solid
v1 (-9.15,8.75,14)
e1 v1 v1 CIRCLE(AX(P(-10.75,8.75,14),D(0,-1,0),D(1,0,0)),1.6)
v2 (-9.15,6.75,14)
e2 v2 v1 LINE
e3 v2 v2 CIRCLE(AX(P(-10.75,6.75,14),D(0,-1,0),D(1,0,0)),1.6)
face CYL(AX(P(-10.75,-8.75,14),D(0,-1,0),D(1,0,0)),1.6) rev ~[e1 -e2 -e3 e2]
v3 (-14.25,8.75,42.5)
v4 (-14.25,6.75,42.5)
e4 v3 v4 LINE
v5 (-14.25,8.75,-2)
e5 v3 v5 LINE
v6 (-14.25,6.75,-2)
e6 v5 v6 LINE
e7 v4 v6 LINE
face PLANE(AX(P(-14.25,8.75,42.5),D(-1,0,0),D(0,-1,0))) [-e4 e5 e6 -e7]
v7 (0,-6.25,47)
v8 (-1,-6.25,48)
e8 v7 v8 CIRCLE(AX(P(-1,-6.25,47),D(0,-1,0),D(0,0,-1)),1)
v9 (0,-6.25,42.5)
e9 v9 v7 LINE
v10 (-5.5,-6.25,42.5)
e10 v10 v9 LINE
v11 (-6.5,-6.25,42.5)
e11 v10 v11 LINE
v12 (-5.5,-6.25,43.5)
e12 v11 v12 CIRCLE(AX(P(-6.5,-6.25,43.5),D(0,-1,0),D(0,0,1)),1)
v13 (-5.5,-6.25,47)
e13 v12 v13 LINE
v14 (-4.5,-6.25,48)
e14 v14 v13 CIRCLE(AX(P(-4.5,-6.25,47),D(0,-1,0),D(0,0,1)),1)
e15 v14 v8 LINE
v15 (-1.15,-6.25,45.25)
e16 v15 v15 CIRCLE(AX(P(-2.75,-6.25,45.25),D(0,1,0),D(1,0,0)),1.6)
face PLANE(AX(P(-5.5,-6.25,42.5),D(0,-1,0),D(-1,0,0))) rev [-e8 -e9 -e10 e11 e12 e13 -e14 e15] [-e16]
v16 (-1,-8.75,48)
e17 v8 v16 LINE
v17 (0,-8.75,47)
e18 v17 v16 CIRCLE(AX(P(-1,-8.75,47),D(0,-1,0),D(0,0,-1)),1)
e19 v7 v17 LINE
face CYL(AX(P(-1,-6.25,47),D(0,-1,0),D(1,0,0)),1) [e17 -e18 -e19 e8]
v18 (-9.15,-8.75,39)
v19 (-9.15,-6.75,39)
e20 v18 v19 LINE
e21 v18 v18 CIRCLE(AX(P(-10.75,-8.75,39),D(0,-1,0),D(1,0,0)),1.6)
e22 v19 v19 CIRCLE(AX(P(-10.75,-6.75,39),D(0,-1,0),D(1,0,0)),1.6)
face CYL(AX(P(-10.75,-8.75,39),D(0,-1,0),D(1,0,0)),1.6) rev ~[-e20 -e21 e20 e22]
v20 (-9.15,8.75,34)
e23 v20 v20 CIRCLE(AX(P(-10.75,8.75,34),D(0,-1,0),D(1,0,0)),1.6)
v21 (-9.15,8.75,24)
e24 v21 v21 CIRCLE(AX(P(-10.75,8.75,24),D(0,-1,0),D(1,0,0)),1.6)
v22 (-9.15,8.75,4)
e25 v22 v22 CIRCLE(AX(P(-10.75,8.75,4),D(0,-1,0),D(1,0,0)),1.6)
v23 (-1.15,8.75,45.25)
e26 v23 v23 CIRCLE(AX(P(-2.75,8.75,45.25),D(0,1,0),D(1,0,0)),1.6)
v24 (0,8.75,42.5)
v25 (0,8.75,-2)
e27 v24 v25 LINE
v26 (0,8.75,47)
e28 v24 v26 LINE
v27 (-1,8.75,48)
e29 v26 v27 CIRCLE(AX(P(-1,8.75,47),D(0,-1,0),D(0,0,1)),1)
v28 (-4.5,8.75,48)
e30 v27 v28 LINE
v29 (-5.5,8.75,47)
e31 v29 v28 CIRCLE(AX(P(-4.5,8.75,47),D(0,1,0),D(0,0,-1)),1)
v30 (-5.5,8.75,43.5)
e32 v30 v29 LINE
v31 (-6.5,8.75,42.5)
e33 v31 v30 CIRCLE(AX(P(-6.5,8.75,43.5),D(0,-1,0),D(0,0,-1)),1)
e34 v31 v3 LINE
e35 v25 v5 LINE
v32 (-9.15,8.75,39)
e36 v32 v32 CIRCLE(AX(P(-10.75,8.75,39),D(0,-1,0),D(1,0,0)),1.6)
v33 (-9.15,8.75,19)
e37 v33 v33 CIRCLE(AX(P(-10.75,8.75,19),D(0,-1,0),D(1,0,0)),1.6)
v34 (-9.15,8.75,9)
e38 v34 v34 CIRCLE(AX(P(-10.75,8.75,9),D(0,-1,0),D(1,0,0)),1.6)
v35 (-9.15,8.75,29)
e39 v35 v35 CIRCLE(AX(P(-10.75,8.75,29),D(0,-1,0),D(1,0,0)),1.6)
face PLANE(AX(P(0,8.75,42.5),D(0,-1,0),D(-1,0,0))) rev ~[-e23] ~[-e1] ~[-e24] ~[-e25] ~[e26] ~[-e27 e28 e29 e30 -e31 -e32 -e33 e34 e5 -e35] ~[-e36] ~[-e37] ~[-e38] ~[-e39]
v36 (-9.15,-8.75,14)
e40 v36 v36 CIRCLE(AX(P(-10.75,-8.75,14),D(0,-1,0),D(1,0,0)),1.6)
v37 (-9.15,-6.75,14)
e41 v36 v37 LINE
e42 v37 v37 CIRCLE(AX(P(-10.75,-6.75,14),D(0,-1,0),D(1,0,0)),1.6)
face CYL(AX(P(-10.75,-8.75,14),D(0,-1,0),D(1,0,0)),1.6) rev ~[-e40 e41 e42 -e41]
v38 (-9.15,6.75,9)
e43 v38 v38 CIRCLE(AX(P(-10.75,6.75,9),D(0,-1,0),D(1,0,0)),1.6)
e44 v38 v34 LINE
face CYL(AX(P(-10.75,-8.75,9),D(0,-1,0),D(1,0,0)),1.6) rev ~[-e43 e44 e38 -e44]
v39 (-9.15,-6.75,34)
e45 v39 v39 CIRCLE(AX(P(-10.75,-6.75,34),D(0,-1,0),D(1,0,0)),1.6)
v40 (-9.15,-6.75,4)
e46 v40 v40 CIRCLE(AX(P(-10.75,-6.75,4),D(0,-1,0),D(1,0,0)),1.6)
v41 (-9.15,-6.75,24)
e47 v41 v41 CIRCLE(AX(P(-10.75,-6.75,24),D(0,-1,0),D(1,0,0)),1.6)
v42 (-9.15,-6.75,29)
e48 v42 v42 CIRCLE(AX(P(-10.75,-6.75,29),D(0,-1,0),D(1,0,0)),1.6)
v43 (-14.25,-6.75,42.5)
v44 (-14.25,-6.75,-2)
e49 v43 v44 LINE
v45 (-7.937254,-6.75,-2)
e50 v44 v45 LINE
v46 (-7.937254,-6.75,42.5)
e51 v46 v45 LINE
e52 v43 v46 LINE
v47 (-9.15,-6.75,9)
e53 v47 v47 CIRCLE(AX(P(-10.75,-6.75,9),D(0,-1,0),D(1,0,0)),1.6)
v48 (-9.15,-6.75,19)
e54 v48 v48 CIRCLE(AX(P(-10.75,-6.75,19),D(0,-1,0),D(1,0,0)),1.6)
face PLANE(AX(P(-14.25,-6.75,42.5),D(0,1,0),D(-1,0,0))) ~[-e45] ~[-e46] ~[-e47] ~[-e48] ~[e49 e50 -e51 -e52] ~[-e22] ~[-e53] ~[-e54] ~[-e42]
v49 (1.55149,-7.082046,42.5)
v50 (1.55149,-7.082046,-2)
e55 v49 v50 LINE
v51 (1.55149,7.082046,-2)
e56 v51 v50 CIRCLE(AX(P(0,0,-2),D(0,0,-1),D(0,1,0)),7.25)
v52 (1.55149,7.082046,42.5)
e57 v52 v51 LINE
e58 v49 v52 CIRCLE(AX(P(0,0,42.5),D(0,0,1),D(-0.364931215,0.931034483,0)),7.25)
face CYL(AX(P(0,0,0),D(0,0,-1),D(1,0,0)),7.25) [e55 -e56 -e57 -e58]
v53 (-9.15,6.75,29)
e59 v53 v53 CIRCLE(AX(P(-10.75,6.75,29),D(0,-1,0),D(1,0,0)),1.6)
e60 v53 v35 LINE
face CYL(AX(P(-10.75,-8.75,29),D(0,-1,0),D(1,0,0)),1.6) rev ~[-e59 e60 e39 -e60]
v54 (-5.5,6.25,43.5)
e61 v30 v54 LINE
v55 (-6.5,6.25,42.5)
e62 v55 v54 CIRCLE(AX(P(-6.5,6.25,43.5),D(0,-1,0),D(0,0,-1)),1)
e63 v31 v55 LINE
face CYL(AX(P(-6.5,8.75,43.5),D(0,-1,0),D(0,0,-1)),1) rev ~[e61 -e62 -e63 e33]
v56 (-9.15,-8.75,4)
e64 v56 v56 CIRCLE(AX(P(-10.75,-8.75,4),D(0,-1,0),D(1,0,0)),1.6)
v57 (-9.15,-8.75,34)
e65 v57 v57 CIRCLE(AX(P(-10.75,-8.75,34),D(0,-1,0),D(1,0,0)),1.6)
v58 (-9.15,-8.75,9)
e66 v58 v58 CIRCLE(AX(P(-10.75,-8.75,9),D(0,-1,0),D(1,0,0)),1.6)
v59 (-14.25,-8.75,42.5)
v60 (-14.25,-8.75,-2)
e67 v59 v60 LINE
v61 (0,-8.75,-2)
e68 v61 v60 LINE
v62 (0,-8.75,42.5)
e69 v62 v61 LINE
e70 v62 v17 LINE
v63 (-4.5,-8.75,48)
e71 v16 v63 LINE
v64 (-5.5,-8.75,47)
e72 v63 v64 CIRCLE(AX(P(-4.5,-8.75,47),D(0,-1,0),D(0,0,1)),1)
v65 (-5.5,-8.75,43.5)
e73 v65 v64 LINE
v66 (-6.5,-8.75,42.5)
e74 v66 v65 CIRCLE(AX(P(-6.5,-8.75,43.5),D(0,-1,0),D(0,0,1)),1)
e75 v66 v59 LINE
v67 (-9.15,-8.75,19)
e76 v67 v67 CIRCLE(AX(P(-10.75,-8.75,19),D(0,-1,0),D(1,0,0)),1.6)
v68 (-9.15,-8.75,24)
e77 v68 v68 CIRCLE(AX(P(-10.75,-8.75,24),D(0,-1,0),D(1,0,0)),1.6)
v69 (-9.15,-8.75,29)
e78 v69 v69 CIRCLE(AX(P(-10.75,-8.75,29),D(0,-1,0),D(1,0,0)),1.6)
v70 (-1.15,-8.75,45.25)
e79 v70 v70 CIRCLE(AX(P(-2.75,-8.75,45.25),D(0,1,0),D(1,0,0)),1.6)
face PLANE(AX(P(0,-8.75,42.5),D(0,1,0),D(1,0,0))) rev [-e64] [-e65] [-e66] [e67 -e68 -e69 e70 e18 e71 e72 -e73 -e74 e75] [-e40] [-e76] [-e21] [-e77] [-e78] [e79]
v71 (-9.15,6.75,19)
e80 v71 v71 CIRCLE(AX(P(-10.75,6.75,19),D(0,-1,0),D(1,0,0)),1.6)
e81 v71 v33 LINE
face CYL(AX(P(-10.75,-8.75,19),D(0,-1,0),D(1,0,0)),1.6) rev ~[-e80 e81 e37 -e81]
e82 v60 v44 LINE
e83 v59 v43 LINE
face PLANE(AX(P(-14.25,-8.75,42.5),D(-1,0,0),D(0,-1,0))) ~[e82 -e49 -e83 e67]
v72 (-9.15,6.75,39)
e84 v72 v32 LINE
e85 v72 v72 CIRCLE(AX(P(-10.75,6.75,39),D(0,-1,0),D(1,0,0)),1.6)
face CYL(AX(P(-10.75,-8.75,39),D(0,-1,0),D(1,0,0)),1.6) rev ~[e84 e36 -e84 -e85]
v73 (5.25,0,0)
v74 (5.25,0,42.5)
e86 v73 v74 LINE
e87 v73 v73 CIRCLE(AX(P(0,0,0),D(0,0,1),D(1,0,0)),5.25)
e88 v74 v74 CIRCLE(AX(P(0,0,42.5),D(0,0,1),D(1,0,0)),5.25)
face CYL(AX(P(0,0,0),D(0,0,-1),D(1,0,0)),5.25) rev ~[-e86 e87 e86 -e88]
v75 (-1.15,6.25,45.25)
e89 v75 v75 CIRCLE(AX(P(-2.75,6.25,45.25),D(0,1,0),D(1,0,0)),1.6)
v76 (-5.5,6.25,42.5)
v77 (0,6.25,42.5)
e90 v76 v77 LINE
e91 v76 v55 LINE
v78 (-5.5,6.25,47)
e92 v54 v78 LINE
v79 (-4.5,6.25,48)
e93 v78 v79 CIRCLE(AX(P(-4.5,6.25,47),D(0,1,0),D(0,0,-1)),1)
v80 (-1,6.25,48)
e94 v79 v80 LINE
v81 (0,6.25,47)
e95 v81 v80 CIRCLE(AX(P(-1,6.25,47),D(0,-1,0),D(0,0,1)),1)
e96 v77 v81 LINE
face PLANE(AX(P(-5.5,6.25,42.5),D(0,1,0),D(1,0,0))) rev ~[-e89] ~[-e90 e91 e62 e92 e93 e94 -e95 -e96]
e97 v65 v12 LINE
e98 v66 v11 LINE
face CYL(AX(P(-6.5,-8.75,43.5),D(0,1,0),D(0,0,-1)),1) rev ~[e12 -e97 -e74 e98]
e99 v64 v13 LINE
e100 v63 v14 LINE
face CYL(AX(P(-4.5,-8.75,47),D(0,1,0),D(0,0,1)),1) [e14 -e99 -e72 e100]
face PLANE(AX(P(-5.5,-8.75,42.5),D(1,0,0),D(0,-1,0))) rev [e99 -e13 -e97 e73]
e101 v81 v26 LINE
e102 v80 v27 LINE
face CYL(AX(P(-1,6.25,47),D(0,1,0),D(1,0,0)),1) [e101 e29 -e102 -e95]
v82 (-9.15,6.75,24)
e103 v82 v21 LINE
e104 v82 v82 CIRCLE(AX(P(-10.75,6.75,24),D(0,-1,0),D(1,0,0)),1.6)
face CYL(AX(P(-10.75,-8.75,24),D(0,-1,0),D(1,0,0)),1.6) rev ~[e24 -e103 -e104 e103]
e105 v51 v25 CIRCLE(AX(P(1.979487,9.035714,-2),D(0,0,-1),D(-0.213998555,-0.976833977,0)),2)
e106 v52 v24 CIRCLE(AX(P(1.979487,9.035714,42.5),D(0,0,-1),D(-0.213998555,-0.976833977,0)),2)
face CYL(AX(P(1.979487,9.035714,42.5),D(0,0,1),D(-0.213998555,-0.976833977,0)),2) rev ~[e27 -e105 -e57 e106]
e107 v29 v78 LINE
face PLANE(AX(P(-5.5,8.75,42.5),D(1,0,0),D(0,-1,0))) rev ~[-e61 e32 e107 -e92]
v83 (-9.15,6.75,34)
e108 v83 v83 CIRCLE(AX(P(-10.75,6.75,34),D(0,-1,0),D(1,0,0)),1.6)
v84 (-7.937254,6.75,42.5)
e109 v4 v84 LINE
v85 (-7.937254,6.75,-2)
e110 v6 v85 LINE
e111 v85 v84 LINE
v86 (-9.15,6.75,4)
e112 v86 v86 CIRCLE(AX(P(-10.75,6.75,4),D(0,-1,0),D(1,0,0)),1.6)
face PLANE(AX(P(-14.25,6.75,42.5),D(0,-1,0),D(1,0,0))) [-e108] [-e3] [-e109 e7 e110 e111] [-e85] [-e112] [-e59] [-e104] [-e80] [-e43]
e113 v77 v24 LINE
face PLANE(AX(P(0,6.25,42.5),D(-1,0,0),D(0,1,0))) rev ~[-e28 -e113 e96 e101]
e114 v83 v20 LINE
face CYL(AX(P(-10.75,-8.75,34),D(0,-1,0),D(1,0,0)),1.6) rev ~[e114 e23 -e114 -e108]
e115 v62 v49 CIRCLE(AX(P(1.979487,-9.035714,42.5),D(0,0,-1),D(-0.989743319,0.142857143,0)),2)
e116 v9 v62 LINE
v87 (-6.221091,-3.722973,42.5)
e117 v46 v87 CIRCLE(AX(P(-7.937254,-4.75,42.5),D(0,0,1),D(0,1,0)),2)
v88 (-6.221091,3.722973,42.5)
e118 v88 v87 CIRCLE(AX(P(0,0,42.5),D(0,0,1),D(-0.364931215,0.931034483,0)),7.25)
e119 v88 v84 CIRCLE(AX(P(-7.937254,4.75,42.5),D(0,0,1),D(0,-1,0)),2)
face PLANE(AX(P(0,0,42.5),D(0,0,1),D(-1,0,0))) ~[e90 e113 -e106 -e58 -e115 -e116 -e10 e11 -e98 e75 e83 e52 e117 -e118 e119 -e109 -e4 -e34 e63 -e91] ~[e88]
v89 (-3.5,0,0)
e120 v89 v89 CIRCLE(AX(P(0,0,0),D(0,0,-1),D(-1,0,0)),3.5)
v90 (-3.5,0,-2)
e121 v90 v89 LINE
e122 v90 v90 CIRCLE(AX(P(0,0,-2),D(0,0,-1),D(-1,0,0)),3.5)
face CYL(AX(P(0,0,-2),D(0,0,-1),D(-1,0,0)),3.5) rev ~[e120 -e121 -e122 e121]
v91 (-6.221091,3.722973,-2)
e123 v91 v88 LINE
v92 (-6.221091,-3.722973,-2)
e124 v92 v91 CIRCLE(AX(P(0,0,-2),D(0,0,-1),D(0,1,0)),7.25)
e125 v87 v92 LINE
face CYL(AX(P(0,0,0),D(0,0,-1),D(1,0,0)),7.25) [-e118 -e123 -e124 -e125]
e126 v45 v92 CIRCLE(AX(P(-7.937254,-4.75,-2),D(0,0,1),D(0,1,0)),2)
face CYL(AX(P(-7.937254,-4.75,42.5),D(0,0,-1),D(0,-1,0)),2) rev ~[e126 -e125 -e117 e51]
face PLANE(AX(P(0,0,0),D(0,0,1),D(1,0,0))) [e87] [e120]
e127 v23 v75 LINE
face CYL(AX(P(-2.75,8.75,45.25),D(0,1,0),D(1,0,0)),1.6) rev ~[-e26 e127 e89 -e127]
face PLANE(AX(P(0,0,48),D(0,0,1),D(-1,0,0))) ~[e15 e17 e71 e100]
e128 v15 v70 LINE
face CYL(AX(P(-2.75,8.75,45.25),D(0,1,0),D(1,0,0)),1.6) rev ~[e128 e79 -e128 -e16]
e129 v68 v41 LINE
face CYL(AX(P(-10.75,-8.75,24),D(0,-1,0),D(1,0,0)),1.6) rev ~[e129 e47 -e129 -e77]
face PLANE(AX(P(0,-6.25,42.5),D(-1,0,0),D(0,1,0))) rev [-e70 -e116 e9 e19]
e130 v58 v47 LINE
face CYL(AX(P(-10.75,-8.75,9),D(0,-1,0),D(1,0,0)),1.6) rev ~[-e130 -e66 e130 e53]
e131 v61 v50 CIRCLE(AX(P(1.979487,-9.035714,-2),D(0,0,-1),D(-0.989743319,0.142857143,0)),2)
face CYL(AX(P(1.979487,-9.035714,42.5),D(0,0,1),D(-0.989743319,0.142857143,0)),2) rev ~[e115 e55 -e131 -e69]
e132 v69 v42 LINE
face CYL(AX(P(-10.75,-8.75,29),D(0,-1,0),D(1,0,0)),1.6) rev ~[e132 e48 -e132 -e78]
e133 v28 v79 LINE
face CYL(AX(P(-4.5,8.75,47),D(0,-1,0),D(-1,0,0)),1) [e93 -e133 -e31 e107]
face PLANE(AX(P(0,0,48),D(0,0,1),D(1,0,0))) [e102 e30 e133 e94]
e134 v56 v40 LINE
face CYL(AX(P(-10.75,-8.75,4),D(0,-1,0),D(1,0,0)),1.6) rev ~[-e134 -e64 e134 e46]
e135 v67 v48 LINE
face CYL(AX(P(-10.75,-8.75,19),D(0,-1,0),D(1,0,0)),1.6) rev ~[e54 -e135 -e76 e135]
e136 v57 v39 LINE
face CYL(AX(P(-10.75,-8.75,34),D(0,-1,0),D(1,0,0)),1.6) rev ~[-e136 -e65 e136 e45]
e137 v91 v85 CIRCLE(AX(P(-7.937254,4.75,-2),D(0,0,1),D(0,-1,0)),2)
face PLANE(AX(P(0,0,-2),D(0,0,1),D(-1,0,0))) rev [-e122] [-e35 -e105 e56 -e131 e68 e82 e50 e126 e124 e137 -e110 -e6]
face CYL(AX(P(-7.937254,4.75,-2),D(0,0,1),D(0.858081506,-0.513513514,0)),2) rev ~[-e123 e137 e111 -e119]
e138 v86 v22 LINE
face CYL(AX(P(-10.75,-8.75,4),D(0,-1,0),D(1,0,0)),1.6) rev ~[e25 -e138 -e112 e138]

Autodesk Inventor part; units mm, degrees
ref_plane "YZ Plane" through (0, 0, 0) normal (1, 0, 0) x (0, 1, 0)
ref_plane "XZ Plane" through (0, 0, 0) normal (0, 1, 0) x (-1, 0, 0)
ref_plane "XY Plane" through (0, 0, 0) normal (0, 0, 1) x (1, 0, 0)
sketch "Sketch1" plane through (0, 0, 0) normal (0, 0, 1) x (1, 0, 0)
  circle A0 centre (0, 0) radius 5.25
  circle A1 centre (0, 0) radius 7.25
  dimension "d0" = 10.5
  dimension "d1" = 2
extrude "Extrusion1" add sketch "Sketch1" along normal blind 42.5
extrude "Extrusion2" add sketch "Sketch1" against normal blind 2 contours A0 | A1
sketch "Sketch2" plane through (0, 0, -2) normal (0, 0, -1) x (-1, 0, 0)
  circle A0 centre (0, 0) radius 7.25 construction
  circle A1 centre (0, 0) radius 3.5
  dimension "d6" = 7
extrude "Extrusion3" cut sketch "Sketch2" against normal through all
sketch "Sketch3" plane through (0, 0, 42.5) normal (0, 0, 1) x (1, 0, 0)
  circle A0 centre (0, 0) radius 7.25 construction
  circle A1 centre (0, 0) radius 5.25 construction
  line L0 (0, 0) -> (-18.4312, 0) construction
  circle A2 centre (0, 0) radius 7.25 construction
  line L1 (-2.6458, 6.75) -> (-14.25, 6.75) construction
  line L2 (-14.25, 6.75) -> (-14.25, -6.75) construction
  line L3 (-14.25, -6.75) -> (-2.6458, -6.75) construction
  line L4 (-2.6458, -6.75) -> (-2.6458, 6.75) construction
  line L5 (-7.25, 0) -> (-7.25, 11.3017) construction
  line L6 (-14.25, 6.75) -> (0, 6.75)
  line L7 (0, 6.75) -> (0, 8.75)
  line L8 (0, 8.75) -> (-14.25, 8.75)
  line L9 (-14.25, 8.75) -> (-14.25, 6.75)
  dimension "d9" = 7
  dimension "d10" = 13.5
  dimension "d11" = 2
  dimension "d16" = 0
extrude "Extrusion4" add sketch "Sketch3" against normal up to surface (44.5 mm away)
ref_plane "Work Plane1" through (0, 0, 42.5) normal (0, 1, 0) x (1, 0, 0)
mirror "Mirror1" about plane through (0, 0, 42.5) normal (0, 1, 0) of "Extrusion4"
fillet "Fillet1" radius 2 2 edges at (0, 7.25, 20.25) (0, -7.25, 20.25)
fillet "Fillet2" radius 2 2 edges at (-2.6458, 6.75, 20.25) (-2.6458, -6.75, 20.25)
sketch "Sketch4" plane through (-14.25, -8.75, -2) normal (0, -1, 0) x (1, 0, 0)
  line L0 (0, 0) -> (14.25, 0) construction
  line L1 (14.25, 44.5) -> (14.25, 0) construction
  line L2 (14.25, 44.5) -> (0, 44.5) construction
  line L3 (0, 44.5) -> (0, 0) construction
  line L4 (3.5, 56.7252) -> (3.5, -16.7448) construction
  circle A0 centre (3.5, 6) radius 1.6
  line L5 (3.5, 61.7252) -> (3.5, -11.7448) construction
  circle A1 centre (3.5, 11) radius 1.6
  line L6 (3.5, 66.7252) -> (3.5, -6.7448) construction
  circle A2 centre (3.5, 16) radius 1.6
  line L7 (3.5, 71.7252) -> (3.5, -1.7448) construction
  circle A3 centre (3.5, 21) radius 1.6
  line L8 (3.5, 76.7252) -> (3.5, 3.2552) construction
  circle A4 centre (3.5, 26) radius 1.6
  line L9 (3.5, 81.7252) -> (3.5, 8.2552) construction
  circle A5 centre (3.5, 31) radius 1.6
  line L10 (3.5, 86.7252) -> (3.5, 13.2552) construction
  circle A6 centre (3.5, 36) radius 1.6
  line L11 (3.5, 91.7252) -> (3.5, 18.2552) construction
  circle A7 centre (3.5, 41) radius 1.6
  point P0 (14.25, 2)
  dimension "d19" = 3.5
  dimension "d20" = 3.2
  dimension "d21" = 6
  dimension "d24" = 5
extrude "Extrusion5" cut sketch "Sketch4" against normal through all
sketch "Sketch5" plane through (0, 0, 42.5) normal (0, 0, 1) x (1, 0, 0)
  arc A0 (1.5515, -7.082) -> (1.5515, 7.082) centre (0, 0) ccw construction
  arc A1 (0, 8.75) -> (1.5515, 7.082) centre (1.9795, 9.0357) ccw construction
  line L0 (0, 8.75) -> (-14.25, 8.75) construction
  line L1 (-14.25, 8.75) -> (-14.25, 6.75) construction
  line L2 (-14.25, 6.75) -> (-7.9373, 6.75) construction
  arc A2 (-6.2211, 3.723) -> (-7.9373, 6.75) centre (-7.9373, 4.75) ccw construction
  arc A3 (-6.2211, 3.723) -> (-6.2211, -3.723) centre (0, 0) ccw construction
  arc A4 (-7.9373, -6.75) -> (-6.2211, -3.723) centre (-7.9373, -4.75) ccw construction
  line L3 (-14.25, -6.75) -> (-7.9373, -6.75) construction
  line L4 (-14.25, -8.75) -> (-14.25, -6.75) construction
  line L5 (0, -8.75) -> (-14.25, -8.75) construction
  arc A5 (1.5515, -7.082) -> (0, -8.75) centre (1.9795, -9.0357) ccw construction
  circle A6 centre (0, 0) radius 5.25 construction
  line L6 (0, 8.75) -> (-14.25, 8.75) projected
  line L7 (0, 8.75) -> (-5.5, 8.75)
  line L8 (-5.5, 8.75) -> (-5.5, 6.25)
  line L9 (-5.5, 6.25) -> (0, 6.25)
  line L10 (0, 6.25) -> (0, 8.75)
  dimension "d31" = 2.5
  dimension "d32" = 5.5
extrude "Extrusion6" add sketch "Sketch5" along normal blind 5.5
mirror "Mirror2" about plane through (0, 0, 42.5) normal (0, 1, 0) of "Extrusion6"
sketch "Sketch6" plane through (-14.25, 8.75, 42.5) normal (0, 1, 0) x (1, 0, 0)
  circle A0 centre (3.5, 8.5) radius 1.6 construction
  circle A1 centre (3.5, 18.5) radius 1.6 construction
  circle A2 centre (3.5, 28.5) radius 1.6 construction
  circle A3 centre (3.5, 38.5) radius 1.6 construction
  circle A4 centre (3.5, 33.5) radius 1.6 construction
  circle A5 centre (3.5, 23.5) radius 1.6 construction
  circle A6 centre (3.5, 13.5) radius 1.6 construction
  circle A7 centre (3.5, 3.5) radius 1.6 construction
  line L0 (0, 44.5) -> (14.25, 44.5) construction
  line L1 (0, 0) -> (0, 44.5) construction
  line L2 (8.75, 0) -> (0, 0) construction
  line L3 (8.75, 0) -> (8.75, -5.5) construction
  line L4 (14.25, -5.5) -> (8.75, -5.5) construction
  line L5 (14.25, 0) -> (14.25, -5.5) construction
  line L6 (14.25, 0) -> (14.25, 44.5) construction
  line L7 (14.25, 0) -> (14.25, 44.5) construction
  line L8 (14.25, 0) -> (8.75, -5.5) construction
  line L9 (8.75, -5.5) -> (14.25, -5.5) construction
  line L10 (14.25, -5.5) -> (8.75, 0) construction
  circle A8 centre (11.5, -2.75) radius 1.6
  point P0 (14.25, 42.5)
  dimension "d35" = 3.2
extrude "Extrusion7" cut sketch "Sketch6" against normal through all
fillet "Fillet3" radius 1 6 edges at (-5.5, 7.5, 42.5) (-5.5, 7.5, 48) (0, 7.5, 48) (-5.5, -7.5, 42.5) (-5.5, -7.5, 48) (0, -7.5, 48)
properties part number "magnet-holder"
